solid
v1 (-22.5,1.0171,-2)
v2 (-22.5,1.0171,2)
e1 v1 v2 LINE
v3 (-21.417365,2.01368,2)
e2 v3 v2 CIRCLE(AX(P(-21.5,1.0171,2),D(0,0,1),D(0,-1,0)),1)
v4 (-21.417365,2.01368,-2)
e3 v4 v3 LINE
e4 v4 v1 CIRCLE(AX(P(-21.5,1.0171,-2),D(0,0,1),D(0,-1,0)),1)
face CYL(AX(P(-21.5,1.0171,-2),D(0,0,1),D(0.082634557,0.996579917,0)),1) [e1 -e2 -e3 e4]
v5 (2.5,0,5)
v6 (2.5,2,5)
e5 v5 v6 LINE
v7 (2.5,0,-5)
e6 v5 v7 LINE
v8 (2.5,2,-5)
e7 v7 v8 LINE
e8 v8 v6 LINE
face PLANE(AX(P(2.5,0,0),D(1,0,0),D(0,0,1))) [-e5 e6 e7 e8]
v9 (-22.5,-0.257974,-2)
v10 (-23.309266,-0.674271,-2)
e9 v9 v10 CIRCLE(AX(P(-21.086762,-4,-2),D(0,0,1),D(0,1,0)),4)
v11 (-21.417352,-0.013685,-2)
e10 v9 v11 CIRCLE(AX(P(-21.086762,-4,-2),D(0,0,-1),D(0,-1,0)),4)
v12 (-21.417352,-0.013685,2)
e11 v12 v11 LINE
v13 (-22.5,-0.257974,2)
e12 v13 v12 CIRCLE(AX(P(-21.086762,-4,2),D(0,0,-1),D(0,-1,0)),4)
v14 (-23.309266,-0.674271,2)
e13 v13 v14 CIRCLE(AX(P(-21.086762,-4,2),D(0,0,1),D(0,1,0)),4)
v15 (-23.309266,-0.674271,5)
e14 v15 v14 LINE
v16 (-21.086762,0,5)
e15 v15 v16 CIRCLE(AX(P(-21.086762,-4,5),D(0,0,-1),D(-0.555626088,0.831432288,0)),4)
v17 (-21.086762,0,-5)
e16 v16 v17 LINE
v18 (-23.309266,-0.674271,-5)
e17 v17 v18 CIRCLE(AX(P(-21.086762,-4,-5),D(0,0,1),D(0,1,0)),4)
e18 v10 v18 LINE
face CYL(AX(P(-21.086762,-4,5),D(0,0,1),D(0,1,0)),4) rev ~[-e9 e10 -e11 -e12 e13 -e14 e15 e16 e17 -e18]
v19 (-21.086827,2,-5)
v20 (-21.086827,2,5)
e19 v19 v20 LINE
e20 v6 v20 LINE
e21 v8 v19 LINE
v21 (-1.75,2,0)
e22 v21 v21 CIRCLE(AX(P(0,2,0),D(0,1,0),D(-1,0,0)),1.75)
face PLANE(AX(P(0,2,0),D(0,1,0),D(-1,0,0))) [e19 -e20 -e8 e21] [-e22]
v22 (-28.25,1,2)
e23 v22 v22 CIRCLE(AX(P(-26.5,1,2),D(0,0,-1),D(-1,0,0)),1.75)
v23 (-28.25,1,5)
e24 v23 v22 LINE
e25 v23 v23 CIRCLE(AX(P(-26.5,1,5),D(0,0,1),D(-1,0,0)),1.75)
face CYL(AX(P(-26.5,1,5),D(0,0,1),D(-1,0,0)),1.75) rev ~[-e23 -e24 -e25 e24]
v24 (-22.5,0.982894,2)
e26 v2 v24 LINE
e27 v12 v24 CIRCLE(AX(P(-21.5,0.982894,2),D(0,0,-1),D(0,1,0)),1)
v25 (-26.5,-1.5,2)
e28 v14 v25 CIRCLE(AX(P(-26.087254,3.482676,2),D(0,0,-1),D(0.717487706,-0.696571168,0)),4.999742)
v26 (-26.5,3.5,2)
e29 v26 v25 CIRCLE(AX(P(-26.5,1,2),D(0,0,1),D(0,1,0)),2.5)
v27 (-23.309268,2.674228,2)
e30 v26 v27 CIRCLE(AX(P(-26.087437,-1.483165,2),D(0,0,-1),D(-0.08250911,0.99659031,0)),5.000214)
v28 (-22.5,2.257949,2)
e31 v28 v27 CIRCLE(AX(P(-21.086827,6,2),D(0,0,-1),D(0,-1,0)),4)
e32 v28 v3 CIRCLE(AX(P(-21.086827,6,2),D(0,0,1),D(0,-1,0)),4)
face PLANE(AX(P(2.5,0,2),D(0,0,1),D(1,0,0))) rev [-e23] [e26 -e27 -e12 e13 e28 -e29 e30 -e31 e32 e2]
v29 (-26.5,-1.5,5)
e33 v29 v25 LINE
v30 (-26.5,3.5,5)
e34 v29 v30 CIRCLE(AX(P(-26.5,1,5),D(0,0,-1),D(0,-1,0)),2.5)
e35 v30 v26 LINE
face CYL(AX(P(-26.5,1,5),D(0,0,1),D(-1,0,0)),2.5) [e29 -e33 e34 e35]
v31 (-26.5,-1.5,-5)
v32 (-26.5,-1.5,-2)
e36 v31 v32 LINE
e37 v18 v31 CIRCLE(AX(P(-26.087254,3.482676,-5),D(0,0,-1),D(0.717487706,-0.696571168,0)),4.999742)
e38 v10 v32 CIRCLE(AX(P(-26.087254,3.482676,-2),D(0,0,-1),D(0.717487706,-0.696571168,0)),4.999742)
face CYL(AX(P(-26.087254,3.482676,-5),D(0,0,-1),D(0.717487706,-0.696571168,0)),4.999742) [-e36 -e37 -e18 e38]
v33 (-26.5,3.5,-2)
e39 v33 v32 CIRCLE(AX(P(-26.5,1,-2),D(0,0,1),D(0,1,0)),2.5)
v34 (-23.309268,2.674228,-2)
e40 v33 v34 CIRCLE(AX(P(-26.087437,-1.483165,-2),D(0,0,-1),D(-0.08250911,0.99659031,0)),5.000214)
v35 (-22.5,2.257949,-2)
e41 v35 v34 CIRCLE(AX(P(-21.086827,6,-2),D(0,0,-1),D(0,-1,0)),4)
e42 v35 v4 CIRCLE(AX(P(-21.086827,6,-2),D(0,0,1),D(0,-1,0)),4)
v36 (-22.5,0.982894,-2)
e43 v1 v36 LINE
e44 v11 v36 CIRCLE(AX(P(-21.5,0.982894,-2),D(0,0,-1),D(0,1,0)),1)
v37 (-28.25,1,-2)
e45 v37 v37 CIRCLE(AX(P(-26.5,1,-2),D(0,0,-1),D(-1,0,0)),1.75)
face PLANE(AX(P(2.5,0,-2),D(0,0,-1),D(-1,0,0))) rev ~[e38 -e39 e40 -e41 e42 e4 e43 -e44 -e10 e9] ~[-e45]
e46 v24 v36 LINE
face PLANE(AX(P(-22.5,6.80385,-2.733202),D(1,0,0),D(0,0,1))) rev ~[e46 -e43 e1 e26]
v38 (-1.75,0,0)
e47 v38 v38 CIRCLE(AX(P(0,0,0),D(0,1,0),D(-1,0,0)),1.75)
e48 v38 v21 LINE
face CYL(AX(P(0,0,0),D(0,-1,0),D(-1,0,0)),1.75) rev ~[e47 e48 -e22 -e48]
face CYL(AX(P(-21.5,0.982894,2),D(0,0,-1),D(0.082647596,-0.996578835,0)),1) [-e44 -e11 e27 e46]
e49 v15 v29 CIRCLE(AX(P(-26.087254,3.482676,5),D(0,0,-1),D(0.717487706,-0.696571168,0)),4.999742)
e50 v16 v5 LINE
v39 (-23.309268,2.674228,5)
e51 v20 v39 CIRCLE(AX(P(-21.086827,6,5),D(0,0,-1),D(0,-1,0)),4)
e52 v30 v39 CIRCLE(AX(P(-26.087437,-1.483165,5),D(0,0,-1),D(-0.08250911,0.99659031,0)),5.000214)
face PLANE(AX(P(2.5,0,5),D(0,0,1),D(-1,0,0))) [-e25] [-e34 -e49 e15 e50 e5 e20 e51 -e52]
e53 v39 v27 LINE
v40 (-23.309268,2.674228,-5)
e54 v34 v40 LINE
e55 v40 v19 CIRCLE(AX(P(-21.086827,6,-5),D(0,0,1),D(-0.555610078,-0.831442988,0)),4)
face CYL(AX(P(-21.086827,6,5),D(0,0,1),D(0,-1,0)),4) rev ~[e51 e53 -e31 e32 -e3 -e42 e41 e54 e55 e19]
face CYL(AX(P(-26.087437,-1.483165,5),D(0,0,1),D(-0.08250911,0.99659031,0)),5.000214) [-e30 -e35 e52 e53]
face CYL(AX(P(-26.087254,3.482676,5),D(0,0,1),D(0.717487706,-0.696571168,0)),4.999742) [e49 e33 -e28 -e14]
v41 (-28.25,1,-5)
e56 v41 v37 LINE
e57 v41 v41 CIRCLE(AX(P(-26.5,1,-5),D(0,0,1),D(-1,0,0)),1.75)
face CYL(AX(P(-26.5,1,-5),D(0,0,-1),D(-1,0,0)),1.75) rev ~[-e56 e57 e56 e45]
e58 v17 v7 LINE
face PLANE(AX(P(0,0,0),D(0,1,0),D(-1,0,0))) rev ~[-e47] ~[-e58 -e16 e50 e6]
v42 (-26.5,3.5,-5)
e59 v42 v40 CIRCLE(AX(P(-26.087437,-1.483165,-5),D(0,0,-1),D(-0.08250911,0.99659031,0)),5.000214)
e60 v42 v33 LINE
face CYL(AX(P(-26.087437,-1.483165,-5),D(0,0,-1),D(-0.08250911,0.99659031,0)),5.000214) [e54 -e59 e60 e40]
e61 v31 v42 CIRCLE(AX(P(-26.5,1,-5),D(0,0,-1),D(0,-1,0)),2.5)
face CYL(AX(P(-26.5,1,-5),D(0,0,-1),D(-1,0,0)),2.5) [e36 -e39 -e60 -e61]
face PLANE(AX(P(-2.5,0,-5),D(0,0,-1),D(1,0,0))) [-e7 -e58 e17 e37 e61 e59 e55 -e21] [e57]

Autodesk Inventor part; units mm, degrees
ref_plane "YZ Plane" through (0, 0, 0) normal (1, 0, 0) x (0, 1, 0)
ref_plane "XZ Plane" through (0, 0, 0) normal (0, 1, 0) x (-1, 0, 0)
sketch "Szkic1" plane through (0, 0, 0) normal (0, 1, 0) x (-1, 0, 0)
  line L0 (-2.5, 5) -> (2.5, 5)
  line L1 (2.5, 5) -> (2.5, -5)
  line L2 (2.5, -5) -> (-2.5, -5)
  line L3 (-2.5, -5) -> (-2.5, 5)
  line L4 (-2.5, 5) -> (2.5, -5) construction
  line L5 (2.5, 5) -> (-2.5, -5) construction
  circle A0 centre (0, 0) radius 1.75
  line L6 (2.5, 5) -> (22.5, 5)
  line L7 (22.5, 5) -> (22.5, -5)
  line L8 (22.5, -5) -> (2.5, -5)
  line L9 (2.5, -5) -> (2.5, 5)
  line L10 (-2.5, 0) -> (-30.5, 0)
  line L11 (-30.5, 0) -> (-30.5, -9)
  line L12 (-30.5, -9) -> (-2.5, -9)
  line L13 (-2.5, -9) -> (-2.5, 0)
  line L14 (-30.5, 0) -> (-30.5, 9)
  line L15 (-30.5, 9) -> (-2.5, 9)
  line L16 (-2.5, 9) -> (-2.5, 0)
  dimension "d0" = 5
  dimension "d1" = 10
  dimension "d2" = 3.5
  dimension "d3" = 20
  dimension "d4" = 10
  dimension "d23" = 28
  dimension "d24" = 9
extrude "Wyciągnięcie proste1" add sketch "Szkic1" along normal blind 2 contours L0 L1 L2 L3 | L6 L7 L8 L1
sketch "Szkic2" plane through (2.5, 0, -5) normal (0, 0, -1) x (-1, 0, 0)
  line L0 (25, 0) -> (25, 2) projected
  line L1 (25, 1) -> (29, 1)
  line L2 (25, 1) -> (29, 1) construction
  circle A0 centre (29, 1) radius 1.75
  circle A1 centre (29, 1) radius 2.5
  line L3 (29, 3.5) -> (29, 3.5)
  line L4 (29, -1.5) -> (29, -1.5)
  arc A2 (29, 3.5) -> (25, 2) centre (28.5874, -1.4829) ccw
  arc A3 (25, 0) -> (29, -1.5) centre (28.5874, 3.4829) ccw
  point P0 (2.5, 0)
  point P1 (29, 3.5)
  point P2 (29, -1.5)
  dimension "d10" = 4
  dimension "d11" = 0
  dimension "d12" = 3.5
  dimension "d13" = 5
  dimension "d14" = 0
  dimension "d15" = 0
  dimension "d16" = 5
  dimension "d17" = 5
extrude "Wyciągnięcie proste2" add sketch "Szkic2" against normal blind 3
ref_plane "Płaszczyzna konstrukcyjna1" through (2.5, 0, 0) normal (0, 0, -1) x (-1, 0, 0)
mirror "Odbij1" about plane through (2.5, 0, 0) normal (0, 0, -1) of "Wyciągnięcie proste2"
fillet "Zaokrąglenie1" radius 4 4 edges at (-22.5, 2, -3.5) (-22.5, 2, 3.5) (-22.5, 0, -3.5) (-22.5, 0, 3.5)
fillet "Zaokrąglenie2" radius 1 2 edges at (-22.5, 2.258, 0) (-22.5, -0.258, 0)
properties part number "lamp_p1"
